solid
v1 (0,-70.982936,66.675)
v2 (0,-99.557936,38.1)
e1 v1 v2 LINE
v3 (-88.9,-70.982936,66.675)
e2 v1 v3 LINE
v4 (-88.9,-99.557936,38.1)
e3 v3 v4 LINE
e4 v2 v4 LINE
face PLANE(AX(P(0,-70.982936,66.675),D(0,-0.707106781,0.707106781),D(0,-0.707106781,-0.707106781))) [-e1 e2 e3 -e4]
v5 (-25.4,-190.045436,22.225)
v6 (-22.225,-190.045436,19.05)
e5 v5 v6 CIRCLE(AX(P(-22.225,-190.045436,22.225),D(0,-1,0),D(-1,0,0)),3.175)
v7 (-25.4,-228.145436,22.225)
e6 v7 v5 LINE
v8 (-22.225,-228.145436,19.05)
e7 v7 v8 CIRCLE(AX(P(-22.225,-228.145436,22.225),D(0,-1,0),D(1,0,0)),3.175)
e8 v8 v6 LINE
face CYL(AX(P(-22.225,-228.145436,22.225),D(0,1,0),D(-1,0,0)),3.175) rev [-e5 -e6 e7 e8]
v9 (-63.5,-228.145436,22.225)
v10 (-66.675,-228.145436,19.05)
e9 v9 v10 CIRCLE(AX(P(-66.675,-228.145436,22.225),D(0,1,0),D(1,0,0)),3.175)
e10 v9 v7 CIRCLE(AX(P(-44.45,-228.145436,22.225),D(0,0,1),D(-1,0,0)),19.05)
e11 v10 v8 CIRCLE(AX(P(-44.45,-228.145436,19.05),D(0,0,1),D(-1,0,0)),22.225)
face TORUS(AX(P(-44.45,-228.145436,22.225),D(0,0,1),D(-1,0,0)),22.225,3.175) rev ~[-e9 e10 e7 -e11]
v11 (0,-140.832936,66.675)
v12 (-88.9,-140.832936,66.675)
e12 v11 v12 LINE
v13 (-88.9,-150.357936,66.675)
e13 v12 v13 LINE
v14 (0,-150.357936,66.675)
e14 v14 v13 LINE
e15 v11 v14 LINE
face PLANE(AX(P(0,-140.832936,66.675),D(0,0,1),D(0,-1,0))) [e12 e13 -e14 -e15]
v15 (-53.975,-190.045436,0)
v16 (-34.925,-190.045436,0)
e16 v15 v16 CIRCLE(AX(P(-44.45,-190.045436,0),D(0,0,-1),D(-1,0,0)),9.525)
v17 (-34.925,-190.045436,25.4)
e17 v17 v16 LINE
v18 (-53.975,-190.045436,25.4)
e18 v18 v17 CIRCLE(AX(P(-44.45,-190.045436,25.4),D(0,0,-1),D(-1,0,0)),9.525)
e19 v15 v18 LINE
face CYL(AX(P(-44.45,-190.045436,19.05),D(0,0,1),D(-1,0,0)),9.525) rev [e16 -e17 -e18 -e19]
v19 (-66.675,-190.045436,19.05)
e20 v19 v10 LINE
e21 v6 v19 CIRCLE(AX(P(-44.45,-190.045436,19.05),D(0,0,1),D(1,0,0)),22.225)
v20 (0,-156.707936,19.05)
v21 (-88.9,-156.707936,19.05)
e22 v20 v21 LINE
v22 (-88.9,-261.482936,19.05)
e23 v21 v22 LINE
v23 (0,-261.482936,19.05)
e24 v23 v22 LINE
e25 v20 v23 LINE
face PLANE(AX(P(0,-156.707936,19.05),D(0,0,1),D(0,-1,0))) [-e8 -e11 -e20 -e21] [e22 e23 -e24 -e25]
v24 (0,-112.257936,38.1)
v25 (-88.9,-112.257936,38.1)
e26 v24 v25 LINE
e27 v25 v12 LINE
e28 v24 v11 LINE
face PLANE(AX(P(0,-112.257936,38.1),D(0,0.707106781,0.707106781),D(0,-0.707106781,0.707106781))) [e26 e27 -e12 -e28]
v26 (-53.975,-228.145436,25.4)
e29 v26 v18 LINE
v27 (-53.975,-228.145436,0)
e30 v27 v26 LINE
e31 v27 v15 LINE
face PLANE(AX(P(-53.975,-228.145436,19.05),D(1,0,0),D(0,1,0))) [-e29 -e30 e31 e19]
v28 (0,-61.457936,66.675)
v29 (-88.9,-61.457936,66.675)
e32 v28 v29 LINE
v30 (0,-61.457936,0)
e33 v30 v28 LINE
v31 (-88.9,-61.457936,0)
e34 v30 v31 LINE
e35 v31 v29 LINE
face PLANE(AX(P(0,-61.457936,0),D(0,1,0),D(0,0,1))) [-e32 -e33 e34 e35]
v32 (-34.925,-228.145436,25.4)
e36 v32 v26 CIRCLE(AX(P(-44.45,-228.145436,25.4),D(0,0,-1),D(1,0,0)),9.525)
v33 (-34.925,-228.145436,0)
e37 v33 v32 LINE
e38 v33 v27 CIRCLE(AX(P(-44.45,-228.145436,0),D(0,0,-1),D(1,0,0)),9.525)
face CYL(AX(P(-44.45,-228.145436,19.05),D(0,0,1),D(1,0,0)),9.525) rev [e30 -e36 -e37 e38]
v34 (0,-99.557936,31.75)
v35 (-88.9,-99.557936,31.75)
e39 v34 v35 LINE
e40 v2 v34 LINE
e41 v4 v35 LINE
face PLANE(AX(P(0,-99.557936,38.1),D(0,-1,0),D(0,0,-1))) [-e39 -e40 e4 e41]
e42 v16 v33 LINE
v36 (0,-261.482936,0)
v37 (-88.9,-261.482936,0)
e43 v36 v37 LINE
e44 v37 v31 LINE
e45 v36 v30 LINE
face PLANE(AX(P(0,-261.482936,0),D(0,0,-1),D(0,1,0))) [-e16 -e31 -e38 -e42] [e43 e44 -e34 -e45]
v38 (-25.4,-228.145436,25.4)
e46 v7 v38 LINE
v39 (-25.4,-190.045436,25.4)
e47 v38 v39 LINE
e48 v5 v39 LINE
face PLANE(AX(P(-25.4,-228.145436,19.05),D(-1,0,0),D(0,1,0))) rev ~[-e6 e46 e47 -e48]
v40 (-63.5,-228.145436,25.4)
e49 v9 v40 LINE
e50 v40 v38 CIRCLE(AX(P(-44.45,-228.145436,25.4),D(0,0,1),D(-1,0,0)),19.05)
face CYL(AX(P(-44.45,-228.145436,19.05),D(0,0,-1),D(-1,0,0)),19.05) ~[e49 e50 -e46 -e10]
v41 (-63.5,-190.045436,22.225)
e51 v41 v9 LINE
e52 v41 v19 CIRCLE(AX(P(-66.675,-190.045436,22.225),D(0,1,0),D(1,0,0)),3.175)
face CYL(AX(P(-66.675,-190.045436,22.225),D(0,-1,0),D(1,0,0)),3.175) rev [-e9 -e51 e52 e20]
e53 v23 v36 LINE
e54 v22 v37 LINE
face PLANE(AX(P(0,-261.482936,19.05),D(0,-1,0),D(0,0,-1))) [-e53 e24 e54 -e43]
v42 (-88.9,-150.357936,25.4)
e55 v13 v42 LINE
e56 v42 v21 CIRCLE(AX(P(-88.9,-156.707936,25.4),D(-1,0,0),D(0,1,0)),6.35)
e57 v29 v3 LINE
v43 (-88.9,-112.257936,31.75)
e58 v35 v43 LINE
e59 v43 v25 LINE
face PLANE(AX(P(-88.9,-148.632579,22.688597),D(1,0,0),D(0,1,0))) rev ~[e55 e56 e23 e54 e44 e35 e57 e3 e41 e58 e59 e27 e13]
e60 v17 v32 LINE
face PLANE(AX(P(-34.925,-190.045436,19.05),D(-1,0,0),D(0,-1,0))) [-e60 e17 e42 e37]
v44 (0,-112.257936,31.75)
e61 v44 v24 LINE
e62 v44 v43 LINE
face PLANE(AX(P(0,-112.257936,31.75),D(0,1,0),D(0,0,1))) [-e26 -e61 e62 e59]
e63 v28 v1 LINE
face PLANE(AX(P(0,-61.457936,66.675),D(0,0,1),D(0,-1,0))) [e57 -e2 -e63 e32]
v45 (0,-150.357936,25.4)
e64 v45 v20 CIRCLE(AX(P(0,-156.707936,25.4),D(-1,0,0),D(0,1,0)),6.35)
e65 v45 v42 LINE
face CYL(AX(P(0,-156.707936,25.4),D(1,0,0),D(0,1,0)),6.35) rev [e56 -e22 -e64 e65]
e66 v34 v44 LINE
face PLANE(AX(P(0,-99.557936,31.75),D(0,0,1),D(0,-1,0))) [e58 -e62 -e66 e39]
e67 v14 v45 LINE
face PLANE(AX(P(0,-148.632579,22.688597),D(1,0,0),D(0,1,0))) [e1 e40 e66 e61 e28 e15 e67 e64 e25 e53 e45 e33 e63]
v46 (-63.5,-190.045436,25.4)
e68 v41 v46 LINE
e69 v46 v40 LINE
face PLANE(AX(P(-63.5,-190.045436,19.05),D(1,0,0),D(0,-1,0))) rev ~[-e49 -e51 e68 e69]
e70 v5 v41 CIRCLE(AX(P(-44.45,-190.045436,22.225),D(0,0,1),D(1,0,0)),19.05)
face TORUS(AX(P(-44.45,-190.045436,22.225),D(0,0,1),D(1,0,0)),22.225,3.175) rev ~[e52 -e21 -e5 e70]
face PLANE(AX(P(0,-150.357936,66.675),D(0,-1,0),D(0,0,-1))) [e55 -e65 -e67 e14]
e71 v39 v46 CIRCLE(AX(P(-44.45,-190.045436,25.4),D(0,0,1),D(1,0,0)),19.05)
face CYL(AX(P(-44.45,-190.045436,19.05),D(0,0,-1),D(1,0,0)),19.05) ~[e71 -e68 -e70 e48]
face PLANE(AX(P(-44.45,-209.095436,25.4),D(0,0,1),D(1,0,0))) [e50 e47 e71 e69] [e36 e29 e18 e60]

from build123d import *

# Parameters (mm, degrees)
F1_DEPTH = 88.9
F3_DEPTH = 6.35
F4_DEPTH = 19.05
F5_R     = 3.175


# Not quite as in the source:
# - a length typed as a fraction of an inch, garbled in the dataset ("3 / 203.2 mm" for 3/8 in), is restored


with BuildPart() as f1:
    # F0 (on Right) → F1 (new body)
    with BuildSketch(Plane.YZ):
        with BuildLine():
            Line((-61.4579357207, 19.05), (-61.4579357207, 66.675))
            Line((-61.4579357207, 66.675), (-70.9829357207, 66.675))
            Line((-70.9829357207, 66.675), (-99.5579357207, 38.1))
            Line((-99.5579357207, 38.1), (-99.5579357207, 31.75))
            Line((-99.5579357207, 31.75), (-112.2579357207, 31.75))
            Line((-112.2579357207, 31.75), (-112.2579357207, 38.1))
            Line((-112.2579357207, 38.1), (-140.8329357207, 66.675))
            Line((-140.8329357207, 66.675), (-150.3579357207, 66.675))
            Line((-150.3579357207, 66.675), (-150.3579357207, 25.4))
            ThreePointArc((-150.3579357207, 25.4), (-152.2178076601, 20.9098719395), (-156.7079357207, 19.05))
            Line((-156.7079357207, 19.05), (-261.4829357207, 19.05))
            Line((-261.4829357207, 19.05), (-261.4829357207, 0))
            Line((-261.4829357207, 0), (-150.3579357207, 0))
            Line((-150.3579357207, 0), (-140.8329357207, 0))
            Line((-140.8329357207, 0), (-74.1579357207, 0))
            Line((-74.1579357207, 0), (-70.9829357207, 0))
            Line((-70.9829357207, 0), (-61.4579357207, 0))
            Line((-61.4579357207, 0), (-61.4579357207, 19.05))
        make_face()
    extrude(amount=-F1_DEPTH)

    # F2 (on face) → F3 (join)
    with BuildSketch(Plane.XY.offset(19.05)):
        with BuildLine():
            Line((-25.4, -228.1454357207), (-25.4, -190.0454357207))
            ThreePointArc((-25.4, -190.0454357207), (-44.45, -170.9954357207), (-63.5, -190.0454357207))
            Line((-63.5, -190.0454357207), (-63.5, -228.1454357207))
            ThreePointArc((-63.5, -228.1454357207), (-44.45, -247.1954357207), (-25.4, -228.1454357207))
        make_face()
        with BuildLine():
            ThreePointArc((-34.925, -228.1454357207), (-44.45, -237.6704357207), (-53.975, -228.1454357207))
            Line((-53.975, -228.1454357207), (-53.975, -190.0454357207))
            ThreePointArc((-53.975, -190.0454357207), (-44.45, -180.5204357207), (-34.925, -190.0454357207))
            Line((-34.925, -190.0454357207), (-34.925, -228.1454357207))
        make_face(mode=Mode.SUBTRACT)
    extrude(amount=F3_DEPTH)

    # F4 (cut): a face of the model
    f4_faces = [f1.faces().sort_by_distance(p)[0] for p in [
        (-44.45, -209.0954357207, 19.05),
    ]]
    extrude(f4_faces, amount=-F4_DEPTH, mode=Mode.SUBTRACT)

    # F5
    f5_edges = [f1.edges().sort_by_distance(p)[0] for p in [
        (-63.5, -209.095436, 19.05),
    ]]
    fillet(f5_edges, radius=F5_R)


solid = f1.part
